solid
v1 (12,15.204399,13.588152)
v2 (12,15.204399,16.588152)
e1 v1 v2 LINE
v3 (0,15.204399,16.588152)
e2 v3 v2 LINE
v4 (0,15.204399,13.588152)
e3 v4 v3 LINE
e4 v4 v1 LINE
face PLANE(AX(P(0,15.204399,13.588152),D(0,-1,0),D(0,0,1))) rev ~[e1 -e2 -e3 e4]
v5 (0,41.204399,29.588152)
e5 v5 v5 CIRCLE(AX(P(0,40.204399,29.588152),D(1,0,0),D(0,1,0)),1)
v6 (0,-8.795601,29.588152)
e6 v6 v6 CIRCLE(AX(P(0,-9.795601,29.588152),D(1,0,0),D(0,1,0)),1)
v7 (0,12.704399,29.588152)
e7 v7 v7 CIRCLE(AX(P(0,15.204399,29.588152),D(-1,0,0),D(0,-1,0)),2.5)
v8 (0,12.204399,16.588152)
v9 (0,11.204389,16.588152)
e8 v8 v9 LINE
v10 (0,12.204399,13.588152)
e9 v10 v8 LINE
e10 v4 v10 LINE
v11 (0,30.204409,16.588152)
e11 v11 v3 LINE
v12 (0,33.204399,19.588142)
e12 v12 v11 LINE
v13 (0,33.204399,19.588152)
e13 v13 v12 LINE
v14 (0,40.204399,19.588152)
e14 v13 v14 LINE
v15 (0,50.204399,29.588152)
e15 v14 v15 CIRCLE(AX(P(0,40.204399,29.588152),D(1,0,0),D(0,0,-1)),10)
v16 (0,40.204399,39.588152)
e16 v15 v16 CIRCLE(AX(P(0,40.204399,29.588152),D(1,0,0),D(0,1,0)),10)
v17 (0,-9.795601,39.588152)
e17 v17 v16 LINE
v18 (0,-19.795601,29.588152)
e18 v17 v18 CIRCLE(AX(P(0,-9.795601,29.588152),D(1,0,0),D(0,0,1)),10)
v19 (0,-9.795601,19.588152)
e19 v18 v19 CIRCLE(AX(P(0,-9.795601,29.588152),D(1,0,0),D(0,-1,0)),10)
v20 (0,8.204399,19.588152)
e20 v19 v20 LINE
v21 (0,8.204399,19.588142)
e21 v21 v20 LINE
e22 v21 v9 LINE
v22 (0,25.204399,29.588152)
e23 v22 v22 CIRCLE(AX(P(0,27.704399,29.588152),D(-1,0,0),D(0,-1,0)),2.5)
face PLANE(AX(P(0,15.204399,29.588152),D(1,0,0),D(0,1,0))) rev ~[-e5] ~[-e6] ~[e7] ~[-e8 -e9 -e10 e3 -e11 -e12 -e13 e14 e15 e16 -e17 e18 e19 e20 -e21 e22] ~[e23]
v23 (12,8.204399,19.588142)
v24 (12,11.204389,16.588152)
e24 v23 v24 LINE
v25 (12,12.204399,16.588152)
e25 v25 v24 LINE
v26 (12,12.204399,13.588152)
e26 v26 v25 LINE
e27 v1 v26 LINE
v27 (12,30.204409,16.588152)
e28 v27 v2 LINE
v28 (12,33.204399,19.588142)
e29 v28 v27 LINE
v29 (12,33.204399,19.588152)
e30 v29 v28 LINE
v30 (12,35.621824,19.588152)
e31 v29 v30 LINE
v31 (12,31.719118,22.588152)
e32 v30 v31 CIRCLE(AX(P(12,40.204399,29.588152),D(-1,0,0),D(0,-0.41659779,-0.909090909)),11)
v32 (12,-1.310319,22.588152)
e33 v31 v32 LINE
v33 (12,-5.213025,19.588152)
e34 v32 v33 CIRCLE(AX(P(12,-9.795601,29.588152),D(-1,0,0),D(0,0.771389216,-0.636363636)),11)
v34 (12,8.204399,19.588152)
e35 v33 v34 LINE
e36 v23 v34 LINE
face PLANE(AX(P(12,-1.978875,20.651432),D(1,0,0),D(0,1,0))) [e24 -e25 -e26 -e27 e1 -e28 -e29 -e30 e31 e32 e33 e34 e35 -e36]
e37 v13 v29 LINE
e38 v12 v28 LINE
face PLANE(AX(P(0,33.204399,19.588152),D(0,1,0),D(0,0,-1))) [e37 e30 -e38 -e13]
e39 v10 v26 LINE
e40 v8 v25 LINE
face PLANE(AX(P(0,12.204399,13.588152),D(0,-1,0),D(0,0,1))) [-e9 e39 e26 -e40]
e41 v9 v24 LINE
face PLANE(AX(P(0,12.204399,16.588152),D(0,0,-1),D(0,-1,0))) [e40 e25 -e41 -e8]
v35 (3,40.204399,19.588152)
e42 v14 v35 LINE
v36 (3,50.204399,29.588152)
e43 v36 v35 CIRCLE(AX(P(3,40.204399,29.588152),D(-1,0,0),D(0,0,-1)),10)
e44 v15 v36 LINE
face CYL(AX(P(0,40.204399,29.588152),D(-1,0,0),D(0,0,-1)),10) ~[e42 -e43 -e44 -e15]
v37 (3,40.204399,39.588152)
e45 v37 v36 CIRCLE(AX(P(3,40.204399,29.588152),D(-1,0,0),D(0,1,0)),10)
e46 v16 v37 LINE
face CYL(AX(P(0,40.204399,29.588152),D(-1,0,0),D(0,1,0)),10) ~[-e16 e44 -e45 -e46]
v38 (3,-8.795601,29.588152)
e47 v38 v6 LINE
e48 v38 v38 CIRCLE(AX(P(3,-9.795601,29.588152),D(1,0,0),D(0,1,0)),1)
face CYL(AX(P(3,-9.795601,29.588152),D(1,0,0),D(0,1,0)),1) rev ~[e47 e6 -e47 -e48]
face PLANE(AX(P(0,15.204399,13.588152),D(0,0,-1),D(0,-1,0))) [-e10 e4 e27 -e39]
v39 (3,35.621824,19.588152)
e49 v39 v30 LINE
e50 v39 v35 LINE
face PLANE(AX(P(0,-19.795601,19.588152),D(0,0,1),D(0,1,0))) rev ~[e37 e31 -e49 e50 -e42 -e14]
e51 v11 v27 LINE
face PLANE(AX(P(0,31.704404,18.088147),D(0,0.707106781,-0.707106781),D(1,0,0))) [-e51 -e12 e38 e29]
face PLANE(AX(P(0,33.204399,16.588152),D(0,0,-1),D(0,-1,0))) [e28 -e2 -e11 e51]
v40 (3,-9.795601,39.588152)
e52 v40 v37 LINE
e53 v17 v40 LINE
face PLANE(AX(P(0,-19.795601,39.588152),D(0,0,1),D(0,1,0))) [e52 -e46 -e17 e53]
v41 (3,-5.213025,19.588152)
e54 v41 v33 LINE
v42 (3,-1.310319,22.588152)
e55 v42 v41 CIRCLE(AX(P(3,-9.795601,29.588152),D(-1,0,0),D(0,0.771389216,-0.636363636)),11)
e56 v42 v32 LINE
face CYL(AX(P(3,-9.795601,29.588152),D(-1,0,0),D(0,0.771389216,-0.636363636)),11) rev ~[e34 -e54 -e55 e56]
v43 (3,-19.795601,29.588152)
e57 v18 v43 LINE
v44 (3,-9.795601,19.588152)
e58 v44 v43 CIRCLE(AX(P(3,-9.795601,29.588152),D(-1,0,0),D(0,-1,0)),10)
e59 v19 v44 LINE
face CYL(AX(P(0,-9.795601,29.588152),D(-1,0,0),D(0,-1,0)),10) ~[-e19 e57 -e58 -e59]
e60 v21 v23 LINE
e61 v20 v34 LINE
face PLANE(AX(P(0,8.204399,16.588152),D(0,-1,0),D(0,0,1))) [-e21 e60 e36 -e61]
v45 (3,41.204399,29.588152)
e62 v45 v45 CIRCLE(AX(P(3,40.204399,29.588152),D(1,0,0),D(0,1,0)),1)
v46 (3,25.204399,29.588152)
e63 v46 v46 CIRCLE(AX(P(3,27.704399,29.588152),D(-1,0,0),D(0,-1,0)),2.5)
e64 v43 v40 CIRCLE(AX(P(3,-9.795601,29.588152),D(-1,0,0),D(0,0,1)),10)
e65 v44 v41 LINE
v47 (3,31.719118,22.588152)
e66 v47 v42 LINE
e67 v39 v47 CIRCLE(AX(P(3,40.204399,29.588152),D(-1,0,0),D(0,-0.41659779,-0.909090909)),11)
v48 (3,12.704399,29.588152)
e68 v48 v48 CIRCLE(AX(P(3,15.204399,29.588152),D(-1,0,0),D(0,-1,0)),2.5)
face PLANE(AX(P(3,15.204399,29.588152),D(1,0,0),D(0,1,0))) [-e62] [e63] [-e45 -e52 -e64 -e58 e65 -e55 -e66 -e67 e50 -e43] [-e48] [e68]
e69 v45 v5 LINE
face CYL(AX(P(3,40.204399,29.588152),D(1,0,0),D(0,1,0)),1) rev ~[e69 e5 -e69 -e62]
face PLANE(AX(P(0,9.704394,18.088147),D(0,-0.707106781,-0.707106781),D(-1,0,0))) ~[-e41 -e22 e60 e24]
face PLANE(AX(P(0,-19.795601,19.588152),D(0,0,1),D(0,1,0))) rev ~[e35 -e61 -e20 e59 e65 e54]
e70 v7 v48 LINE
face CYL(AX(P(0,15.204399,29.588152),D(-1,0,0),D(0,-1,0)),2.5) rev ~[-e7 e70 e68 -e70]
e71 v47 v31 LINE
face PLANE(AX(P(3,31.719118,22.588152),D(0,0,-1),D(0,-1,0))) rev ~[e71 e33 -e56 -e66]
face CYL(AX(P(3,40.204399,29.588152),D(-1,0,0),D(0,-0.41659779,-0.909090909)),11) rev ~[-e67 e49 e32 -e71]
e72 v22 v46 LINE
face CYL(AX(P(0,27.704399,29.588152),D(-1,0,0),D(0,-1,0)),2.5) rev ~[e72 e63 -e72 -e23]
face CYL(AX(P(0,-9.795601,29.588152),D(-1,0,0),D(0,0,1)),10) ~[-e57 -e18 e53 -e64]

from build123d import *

# Parameters (mm, degrees)
F0_W      = 70
F0_H      = 20
F1_DEPTH  = 3
F3_DEPTH  = 9
F5_DEPTH  = 25
F6_R      = 1
F7_DEPTH  = 25
F8_R      = 2.5
F9_DEPTH  = 25
F10_W     = 3
F10_H     = 3
F11_DEPTH = 12
F12_SIZE  = 2.99999


# Not quite as in the source:
# - a fillet or chamfer is up to 0.001 mm smaller than in the source, because OpenCascade refuses the exact size


with BuildPart() as f1:
    # F0 (on Right) → F1 (new body)
    with BuildSketch(Plane.YZ):
        with Locations((15.2043993567, 29.5881517231)):
            Rectangle(F0_W, F0_H)
    extrude(amount=F1_DEPTH)

    # F2 (on face) → F3 (join)
    with BuildSketch(Plane.YZ.offset(3)):
        with BuildLine():
            ThreePointArc((-1.3103192691, 22.5881517231), (-3.0917046048, 20.8670406755), (-5.2130249484, 19.5881517231))
            Line((-5.2130249484, 19.5881517231), (0.2043993567, 19.5881517231))
            Line((0.2043993567, 19.5881517231), (0.2043993567, 22.5881517231))
            Line((0.2043993567, 22.5881517231), (-1.3103192691, 22.5881517231))
        make_face()
        with BuildLine():
            Line((0.2043993567, 22.5881517231), (0.2043993567, 19.5881517231))
            Line((0.2043993567, 19.5881517231), (35.6218236617, 19.5881517231))
            ThreePointArc((35.6218236617, 19.5881517231), (33.5005033181, 20.8670406755), (31.7191179824, 22.5881517231))
            Line((31.7191179824, 22.5881517231), (0.2043993567, 22.5881517231))
        make_face()
    extrude(amount=F3_DEPTH)

    # F4 (on face) → F5 (cut)
    with BuildSketch(Plane(origin=(0, 0, 0), x_dir=(0, -1, 0), z_dir=(-1, 0, 0))):
        with BuildLine():
            Line((19.7956006433, 29.5881517231), (19.7956006433, 39.5881517231))
            Line((19.7956006433, 39.5881517231), (9.7956006433, 39.5881517231))
            ThreePointArc((9.7956006433, 39.5881517231), (16.8666684552, 36.659219535), (19.7956006433, 29.5881517231))
        make_face()
        with BuildLine():
            Line((19.7956006433, 19.5881517231), (19.7956006433, 29.5881517231))
            ThreePointArc((19.7956006433, 29.5881517231), (16.8666684552, 22.5170839113), (9.7956006433, 19.5881517231))
            Line((9.7956006433, 19.5881517231), (19.7956006433, 19.5881517231))
        make_face()
        with BuildLine():
            ThreePointArc((-50.2043993567, 29.5881517231), (-47.2754671685, 36.659219535), (-40.2043993567, 39.5881517231))
            Line((-40.2043993567, 39.5881517231), (-50.2043993567, 39.5881517231))
            Line((-50.2043993567, 39.5881517231), (-50.2043993567, 29.5881517231))
        make_face()
        with BuildLine():
            ThreePointArc((-40.2043993567, 19.5881517231), (-47.2754671685, 22.5170839113), (-50.2043993567, 29.5881517231))
            Line((-50.2043993567, 29.5881517231), (-50.2043993567, 19.5881517231))
            Line((-50.2043993567, 19.5881517231), (-40.2043993567, 19.5881517231))
        make_face()
    extrude(amount=-F5_DEPTH, mode=Mode.SUBTRACT)

    # F6 (on face) → F7 (cut)
    with BuildSketch(Plane.YZ.offset(3)):
        with Locations((-9.7956006433, 29.5881517231)):
            Circle(F6_R)
        with Locations((40.2043993567, 29.5881517231)):
            Circle(F6_R)
    extrude(amount=-F7_DEPTH, mode=Mode.SUBTRACT)

    # F8 (on face) → F9 (cut)
    with BuildSketch(Plane(origin=(0, 0, 0), x_dir=(0, -1, 0), z_dir=(-1, 0, 0))):
        with Locations((-27.7043993567, 29.5881517231)):
            Circle(F8_R)
        with Locations((-15.2043993567, 29.5881517231)):
            Circle(F8_R)
    extrude(amount=-F9_DEPTH, mode=Mode.SUBTRACT)

    # F10 (on face) → F11 (join)
    with BuildSketch(Plane(origin=(0, 0, 0), x_dir=(0, -1, 0), z_dir=(-1, 0, 0))):
        Polygon((-8.2043993567, 16.5881517231), (-8.2043993567, 19.5881517231), (-33.2043993567, 19.5881517231), (-33.2043993567, 16.5881517231), (-15.2043993567, 16.5881517231), (-12.2043993567, 16.5881517231), align=None)
        with Locations((-13.7043993567, 15.0881517231)):
            Rectangle(F10_W, F10_H)
    extrude(amount=-F11_DEPTH)

    # F12 (size 3 in the source; OpenCascade refuses exactly that, so slightly less here)
    f12_edges = [f1.edges().sort_by_distance(p)[0] for p in [
        (6, 8.204399, 16.588152),
        (6, 33.204399, 16.588152),
    ]]
    chamfer(f12_edges, length=F12_SIZE)


solid = f1.part
